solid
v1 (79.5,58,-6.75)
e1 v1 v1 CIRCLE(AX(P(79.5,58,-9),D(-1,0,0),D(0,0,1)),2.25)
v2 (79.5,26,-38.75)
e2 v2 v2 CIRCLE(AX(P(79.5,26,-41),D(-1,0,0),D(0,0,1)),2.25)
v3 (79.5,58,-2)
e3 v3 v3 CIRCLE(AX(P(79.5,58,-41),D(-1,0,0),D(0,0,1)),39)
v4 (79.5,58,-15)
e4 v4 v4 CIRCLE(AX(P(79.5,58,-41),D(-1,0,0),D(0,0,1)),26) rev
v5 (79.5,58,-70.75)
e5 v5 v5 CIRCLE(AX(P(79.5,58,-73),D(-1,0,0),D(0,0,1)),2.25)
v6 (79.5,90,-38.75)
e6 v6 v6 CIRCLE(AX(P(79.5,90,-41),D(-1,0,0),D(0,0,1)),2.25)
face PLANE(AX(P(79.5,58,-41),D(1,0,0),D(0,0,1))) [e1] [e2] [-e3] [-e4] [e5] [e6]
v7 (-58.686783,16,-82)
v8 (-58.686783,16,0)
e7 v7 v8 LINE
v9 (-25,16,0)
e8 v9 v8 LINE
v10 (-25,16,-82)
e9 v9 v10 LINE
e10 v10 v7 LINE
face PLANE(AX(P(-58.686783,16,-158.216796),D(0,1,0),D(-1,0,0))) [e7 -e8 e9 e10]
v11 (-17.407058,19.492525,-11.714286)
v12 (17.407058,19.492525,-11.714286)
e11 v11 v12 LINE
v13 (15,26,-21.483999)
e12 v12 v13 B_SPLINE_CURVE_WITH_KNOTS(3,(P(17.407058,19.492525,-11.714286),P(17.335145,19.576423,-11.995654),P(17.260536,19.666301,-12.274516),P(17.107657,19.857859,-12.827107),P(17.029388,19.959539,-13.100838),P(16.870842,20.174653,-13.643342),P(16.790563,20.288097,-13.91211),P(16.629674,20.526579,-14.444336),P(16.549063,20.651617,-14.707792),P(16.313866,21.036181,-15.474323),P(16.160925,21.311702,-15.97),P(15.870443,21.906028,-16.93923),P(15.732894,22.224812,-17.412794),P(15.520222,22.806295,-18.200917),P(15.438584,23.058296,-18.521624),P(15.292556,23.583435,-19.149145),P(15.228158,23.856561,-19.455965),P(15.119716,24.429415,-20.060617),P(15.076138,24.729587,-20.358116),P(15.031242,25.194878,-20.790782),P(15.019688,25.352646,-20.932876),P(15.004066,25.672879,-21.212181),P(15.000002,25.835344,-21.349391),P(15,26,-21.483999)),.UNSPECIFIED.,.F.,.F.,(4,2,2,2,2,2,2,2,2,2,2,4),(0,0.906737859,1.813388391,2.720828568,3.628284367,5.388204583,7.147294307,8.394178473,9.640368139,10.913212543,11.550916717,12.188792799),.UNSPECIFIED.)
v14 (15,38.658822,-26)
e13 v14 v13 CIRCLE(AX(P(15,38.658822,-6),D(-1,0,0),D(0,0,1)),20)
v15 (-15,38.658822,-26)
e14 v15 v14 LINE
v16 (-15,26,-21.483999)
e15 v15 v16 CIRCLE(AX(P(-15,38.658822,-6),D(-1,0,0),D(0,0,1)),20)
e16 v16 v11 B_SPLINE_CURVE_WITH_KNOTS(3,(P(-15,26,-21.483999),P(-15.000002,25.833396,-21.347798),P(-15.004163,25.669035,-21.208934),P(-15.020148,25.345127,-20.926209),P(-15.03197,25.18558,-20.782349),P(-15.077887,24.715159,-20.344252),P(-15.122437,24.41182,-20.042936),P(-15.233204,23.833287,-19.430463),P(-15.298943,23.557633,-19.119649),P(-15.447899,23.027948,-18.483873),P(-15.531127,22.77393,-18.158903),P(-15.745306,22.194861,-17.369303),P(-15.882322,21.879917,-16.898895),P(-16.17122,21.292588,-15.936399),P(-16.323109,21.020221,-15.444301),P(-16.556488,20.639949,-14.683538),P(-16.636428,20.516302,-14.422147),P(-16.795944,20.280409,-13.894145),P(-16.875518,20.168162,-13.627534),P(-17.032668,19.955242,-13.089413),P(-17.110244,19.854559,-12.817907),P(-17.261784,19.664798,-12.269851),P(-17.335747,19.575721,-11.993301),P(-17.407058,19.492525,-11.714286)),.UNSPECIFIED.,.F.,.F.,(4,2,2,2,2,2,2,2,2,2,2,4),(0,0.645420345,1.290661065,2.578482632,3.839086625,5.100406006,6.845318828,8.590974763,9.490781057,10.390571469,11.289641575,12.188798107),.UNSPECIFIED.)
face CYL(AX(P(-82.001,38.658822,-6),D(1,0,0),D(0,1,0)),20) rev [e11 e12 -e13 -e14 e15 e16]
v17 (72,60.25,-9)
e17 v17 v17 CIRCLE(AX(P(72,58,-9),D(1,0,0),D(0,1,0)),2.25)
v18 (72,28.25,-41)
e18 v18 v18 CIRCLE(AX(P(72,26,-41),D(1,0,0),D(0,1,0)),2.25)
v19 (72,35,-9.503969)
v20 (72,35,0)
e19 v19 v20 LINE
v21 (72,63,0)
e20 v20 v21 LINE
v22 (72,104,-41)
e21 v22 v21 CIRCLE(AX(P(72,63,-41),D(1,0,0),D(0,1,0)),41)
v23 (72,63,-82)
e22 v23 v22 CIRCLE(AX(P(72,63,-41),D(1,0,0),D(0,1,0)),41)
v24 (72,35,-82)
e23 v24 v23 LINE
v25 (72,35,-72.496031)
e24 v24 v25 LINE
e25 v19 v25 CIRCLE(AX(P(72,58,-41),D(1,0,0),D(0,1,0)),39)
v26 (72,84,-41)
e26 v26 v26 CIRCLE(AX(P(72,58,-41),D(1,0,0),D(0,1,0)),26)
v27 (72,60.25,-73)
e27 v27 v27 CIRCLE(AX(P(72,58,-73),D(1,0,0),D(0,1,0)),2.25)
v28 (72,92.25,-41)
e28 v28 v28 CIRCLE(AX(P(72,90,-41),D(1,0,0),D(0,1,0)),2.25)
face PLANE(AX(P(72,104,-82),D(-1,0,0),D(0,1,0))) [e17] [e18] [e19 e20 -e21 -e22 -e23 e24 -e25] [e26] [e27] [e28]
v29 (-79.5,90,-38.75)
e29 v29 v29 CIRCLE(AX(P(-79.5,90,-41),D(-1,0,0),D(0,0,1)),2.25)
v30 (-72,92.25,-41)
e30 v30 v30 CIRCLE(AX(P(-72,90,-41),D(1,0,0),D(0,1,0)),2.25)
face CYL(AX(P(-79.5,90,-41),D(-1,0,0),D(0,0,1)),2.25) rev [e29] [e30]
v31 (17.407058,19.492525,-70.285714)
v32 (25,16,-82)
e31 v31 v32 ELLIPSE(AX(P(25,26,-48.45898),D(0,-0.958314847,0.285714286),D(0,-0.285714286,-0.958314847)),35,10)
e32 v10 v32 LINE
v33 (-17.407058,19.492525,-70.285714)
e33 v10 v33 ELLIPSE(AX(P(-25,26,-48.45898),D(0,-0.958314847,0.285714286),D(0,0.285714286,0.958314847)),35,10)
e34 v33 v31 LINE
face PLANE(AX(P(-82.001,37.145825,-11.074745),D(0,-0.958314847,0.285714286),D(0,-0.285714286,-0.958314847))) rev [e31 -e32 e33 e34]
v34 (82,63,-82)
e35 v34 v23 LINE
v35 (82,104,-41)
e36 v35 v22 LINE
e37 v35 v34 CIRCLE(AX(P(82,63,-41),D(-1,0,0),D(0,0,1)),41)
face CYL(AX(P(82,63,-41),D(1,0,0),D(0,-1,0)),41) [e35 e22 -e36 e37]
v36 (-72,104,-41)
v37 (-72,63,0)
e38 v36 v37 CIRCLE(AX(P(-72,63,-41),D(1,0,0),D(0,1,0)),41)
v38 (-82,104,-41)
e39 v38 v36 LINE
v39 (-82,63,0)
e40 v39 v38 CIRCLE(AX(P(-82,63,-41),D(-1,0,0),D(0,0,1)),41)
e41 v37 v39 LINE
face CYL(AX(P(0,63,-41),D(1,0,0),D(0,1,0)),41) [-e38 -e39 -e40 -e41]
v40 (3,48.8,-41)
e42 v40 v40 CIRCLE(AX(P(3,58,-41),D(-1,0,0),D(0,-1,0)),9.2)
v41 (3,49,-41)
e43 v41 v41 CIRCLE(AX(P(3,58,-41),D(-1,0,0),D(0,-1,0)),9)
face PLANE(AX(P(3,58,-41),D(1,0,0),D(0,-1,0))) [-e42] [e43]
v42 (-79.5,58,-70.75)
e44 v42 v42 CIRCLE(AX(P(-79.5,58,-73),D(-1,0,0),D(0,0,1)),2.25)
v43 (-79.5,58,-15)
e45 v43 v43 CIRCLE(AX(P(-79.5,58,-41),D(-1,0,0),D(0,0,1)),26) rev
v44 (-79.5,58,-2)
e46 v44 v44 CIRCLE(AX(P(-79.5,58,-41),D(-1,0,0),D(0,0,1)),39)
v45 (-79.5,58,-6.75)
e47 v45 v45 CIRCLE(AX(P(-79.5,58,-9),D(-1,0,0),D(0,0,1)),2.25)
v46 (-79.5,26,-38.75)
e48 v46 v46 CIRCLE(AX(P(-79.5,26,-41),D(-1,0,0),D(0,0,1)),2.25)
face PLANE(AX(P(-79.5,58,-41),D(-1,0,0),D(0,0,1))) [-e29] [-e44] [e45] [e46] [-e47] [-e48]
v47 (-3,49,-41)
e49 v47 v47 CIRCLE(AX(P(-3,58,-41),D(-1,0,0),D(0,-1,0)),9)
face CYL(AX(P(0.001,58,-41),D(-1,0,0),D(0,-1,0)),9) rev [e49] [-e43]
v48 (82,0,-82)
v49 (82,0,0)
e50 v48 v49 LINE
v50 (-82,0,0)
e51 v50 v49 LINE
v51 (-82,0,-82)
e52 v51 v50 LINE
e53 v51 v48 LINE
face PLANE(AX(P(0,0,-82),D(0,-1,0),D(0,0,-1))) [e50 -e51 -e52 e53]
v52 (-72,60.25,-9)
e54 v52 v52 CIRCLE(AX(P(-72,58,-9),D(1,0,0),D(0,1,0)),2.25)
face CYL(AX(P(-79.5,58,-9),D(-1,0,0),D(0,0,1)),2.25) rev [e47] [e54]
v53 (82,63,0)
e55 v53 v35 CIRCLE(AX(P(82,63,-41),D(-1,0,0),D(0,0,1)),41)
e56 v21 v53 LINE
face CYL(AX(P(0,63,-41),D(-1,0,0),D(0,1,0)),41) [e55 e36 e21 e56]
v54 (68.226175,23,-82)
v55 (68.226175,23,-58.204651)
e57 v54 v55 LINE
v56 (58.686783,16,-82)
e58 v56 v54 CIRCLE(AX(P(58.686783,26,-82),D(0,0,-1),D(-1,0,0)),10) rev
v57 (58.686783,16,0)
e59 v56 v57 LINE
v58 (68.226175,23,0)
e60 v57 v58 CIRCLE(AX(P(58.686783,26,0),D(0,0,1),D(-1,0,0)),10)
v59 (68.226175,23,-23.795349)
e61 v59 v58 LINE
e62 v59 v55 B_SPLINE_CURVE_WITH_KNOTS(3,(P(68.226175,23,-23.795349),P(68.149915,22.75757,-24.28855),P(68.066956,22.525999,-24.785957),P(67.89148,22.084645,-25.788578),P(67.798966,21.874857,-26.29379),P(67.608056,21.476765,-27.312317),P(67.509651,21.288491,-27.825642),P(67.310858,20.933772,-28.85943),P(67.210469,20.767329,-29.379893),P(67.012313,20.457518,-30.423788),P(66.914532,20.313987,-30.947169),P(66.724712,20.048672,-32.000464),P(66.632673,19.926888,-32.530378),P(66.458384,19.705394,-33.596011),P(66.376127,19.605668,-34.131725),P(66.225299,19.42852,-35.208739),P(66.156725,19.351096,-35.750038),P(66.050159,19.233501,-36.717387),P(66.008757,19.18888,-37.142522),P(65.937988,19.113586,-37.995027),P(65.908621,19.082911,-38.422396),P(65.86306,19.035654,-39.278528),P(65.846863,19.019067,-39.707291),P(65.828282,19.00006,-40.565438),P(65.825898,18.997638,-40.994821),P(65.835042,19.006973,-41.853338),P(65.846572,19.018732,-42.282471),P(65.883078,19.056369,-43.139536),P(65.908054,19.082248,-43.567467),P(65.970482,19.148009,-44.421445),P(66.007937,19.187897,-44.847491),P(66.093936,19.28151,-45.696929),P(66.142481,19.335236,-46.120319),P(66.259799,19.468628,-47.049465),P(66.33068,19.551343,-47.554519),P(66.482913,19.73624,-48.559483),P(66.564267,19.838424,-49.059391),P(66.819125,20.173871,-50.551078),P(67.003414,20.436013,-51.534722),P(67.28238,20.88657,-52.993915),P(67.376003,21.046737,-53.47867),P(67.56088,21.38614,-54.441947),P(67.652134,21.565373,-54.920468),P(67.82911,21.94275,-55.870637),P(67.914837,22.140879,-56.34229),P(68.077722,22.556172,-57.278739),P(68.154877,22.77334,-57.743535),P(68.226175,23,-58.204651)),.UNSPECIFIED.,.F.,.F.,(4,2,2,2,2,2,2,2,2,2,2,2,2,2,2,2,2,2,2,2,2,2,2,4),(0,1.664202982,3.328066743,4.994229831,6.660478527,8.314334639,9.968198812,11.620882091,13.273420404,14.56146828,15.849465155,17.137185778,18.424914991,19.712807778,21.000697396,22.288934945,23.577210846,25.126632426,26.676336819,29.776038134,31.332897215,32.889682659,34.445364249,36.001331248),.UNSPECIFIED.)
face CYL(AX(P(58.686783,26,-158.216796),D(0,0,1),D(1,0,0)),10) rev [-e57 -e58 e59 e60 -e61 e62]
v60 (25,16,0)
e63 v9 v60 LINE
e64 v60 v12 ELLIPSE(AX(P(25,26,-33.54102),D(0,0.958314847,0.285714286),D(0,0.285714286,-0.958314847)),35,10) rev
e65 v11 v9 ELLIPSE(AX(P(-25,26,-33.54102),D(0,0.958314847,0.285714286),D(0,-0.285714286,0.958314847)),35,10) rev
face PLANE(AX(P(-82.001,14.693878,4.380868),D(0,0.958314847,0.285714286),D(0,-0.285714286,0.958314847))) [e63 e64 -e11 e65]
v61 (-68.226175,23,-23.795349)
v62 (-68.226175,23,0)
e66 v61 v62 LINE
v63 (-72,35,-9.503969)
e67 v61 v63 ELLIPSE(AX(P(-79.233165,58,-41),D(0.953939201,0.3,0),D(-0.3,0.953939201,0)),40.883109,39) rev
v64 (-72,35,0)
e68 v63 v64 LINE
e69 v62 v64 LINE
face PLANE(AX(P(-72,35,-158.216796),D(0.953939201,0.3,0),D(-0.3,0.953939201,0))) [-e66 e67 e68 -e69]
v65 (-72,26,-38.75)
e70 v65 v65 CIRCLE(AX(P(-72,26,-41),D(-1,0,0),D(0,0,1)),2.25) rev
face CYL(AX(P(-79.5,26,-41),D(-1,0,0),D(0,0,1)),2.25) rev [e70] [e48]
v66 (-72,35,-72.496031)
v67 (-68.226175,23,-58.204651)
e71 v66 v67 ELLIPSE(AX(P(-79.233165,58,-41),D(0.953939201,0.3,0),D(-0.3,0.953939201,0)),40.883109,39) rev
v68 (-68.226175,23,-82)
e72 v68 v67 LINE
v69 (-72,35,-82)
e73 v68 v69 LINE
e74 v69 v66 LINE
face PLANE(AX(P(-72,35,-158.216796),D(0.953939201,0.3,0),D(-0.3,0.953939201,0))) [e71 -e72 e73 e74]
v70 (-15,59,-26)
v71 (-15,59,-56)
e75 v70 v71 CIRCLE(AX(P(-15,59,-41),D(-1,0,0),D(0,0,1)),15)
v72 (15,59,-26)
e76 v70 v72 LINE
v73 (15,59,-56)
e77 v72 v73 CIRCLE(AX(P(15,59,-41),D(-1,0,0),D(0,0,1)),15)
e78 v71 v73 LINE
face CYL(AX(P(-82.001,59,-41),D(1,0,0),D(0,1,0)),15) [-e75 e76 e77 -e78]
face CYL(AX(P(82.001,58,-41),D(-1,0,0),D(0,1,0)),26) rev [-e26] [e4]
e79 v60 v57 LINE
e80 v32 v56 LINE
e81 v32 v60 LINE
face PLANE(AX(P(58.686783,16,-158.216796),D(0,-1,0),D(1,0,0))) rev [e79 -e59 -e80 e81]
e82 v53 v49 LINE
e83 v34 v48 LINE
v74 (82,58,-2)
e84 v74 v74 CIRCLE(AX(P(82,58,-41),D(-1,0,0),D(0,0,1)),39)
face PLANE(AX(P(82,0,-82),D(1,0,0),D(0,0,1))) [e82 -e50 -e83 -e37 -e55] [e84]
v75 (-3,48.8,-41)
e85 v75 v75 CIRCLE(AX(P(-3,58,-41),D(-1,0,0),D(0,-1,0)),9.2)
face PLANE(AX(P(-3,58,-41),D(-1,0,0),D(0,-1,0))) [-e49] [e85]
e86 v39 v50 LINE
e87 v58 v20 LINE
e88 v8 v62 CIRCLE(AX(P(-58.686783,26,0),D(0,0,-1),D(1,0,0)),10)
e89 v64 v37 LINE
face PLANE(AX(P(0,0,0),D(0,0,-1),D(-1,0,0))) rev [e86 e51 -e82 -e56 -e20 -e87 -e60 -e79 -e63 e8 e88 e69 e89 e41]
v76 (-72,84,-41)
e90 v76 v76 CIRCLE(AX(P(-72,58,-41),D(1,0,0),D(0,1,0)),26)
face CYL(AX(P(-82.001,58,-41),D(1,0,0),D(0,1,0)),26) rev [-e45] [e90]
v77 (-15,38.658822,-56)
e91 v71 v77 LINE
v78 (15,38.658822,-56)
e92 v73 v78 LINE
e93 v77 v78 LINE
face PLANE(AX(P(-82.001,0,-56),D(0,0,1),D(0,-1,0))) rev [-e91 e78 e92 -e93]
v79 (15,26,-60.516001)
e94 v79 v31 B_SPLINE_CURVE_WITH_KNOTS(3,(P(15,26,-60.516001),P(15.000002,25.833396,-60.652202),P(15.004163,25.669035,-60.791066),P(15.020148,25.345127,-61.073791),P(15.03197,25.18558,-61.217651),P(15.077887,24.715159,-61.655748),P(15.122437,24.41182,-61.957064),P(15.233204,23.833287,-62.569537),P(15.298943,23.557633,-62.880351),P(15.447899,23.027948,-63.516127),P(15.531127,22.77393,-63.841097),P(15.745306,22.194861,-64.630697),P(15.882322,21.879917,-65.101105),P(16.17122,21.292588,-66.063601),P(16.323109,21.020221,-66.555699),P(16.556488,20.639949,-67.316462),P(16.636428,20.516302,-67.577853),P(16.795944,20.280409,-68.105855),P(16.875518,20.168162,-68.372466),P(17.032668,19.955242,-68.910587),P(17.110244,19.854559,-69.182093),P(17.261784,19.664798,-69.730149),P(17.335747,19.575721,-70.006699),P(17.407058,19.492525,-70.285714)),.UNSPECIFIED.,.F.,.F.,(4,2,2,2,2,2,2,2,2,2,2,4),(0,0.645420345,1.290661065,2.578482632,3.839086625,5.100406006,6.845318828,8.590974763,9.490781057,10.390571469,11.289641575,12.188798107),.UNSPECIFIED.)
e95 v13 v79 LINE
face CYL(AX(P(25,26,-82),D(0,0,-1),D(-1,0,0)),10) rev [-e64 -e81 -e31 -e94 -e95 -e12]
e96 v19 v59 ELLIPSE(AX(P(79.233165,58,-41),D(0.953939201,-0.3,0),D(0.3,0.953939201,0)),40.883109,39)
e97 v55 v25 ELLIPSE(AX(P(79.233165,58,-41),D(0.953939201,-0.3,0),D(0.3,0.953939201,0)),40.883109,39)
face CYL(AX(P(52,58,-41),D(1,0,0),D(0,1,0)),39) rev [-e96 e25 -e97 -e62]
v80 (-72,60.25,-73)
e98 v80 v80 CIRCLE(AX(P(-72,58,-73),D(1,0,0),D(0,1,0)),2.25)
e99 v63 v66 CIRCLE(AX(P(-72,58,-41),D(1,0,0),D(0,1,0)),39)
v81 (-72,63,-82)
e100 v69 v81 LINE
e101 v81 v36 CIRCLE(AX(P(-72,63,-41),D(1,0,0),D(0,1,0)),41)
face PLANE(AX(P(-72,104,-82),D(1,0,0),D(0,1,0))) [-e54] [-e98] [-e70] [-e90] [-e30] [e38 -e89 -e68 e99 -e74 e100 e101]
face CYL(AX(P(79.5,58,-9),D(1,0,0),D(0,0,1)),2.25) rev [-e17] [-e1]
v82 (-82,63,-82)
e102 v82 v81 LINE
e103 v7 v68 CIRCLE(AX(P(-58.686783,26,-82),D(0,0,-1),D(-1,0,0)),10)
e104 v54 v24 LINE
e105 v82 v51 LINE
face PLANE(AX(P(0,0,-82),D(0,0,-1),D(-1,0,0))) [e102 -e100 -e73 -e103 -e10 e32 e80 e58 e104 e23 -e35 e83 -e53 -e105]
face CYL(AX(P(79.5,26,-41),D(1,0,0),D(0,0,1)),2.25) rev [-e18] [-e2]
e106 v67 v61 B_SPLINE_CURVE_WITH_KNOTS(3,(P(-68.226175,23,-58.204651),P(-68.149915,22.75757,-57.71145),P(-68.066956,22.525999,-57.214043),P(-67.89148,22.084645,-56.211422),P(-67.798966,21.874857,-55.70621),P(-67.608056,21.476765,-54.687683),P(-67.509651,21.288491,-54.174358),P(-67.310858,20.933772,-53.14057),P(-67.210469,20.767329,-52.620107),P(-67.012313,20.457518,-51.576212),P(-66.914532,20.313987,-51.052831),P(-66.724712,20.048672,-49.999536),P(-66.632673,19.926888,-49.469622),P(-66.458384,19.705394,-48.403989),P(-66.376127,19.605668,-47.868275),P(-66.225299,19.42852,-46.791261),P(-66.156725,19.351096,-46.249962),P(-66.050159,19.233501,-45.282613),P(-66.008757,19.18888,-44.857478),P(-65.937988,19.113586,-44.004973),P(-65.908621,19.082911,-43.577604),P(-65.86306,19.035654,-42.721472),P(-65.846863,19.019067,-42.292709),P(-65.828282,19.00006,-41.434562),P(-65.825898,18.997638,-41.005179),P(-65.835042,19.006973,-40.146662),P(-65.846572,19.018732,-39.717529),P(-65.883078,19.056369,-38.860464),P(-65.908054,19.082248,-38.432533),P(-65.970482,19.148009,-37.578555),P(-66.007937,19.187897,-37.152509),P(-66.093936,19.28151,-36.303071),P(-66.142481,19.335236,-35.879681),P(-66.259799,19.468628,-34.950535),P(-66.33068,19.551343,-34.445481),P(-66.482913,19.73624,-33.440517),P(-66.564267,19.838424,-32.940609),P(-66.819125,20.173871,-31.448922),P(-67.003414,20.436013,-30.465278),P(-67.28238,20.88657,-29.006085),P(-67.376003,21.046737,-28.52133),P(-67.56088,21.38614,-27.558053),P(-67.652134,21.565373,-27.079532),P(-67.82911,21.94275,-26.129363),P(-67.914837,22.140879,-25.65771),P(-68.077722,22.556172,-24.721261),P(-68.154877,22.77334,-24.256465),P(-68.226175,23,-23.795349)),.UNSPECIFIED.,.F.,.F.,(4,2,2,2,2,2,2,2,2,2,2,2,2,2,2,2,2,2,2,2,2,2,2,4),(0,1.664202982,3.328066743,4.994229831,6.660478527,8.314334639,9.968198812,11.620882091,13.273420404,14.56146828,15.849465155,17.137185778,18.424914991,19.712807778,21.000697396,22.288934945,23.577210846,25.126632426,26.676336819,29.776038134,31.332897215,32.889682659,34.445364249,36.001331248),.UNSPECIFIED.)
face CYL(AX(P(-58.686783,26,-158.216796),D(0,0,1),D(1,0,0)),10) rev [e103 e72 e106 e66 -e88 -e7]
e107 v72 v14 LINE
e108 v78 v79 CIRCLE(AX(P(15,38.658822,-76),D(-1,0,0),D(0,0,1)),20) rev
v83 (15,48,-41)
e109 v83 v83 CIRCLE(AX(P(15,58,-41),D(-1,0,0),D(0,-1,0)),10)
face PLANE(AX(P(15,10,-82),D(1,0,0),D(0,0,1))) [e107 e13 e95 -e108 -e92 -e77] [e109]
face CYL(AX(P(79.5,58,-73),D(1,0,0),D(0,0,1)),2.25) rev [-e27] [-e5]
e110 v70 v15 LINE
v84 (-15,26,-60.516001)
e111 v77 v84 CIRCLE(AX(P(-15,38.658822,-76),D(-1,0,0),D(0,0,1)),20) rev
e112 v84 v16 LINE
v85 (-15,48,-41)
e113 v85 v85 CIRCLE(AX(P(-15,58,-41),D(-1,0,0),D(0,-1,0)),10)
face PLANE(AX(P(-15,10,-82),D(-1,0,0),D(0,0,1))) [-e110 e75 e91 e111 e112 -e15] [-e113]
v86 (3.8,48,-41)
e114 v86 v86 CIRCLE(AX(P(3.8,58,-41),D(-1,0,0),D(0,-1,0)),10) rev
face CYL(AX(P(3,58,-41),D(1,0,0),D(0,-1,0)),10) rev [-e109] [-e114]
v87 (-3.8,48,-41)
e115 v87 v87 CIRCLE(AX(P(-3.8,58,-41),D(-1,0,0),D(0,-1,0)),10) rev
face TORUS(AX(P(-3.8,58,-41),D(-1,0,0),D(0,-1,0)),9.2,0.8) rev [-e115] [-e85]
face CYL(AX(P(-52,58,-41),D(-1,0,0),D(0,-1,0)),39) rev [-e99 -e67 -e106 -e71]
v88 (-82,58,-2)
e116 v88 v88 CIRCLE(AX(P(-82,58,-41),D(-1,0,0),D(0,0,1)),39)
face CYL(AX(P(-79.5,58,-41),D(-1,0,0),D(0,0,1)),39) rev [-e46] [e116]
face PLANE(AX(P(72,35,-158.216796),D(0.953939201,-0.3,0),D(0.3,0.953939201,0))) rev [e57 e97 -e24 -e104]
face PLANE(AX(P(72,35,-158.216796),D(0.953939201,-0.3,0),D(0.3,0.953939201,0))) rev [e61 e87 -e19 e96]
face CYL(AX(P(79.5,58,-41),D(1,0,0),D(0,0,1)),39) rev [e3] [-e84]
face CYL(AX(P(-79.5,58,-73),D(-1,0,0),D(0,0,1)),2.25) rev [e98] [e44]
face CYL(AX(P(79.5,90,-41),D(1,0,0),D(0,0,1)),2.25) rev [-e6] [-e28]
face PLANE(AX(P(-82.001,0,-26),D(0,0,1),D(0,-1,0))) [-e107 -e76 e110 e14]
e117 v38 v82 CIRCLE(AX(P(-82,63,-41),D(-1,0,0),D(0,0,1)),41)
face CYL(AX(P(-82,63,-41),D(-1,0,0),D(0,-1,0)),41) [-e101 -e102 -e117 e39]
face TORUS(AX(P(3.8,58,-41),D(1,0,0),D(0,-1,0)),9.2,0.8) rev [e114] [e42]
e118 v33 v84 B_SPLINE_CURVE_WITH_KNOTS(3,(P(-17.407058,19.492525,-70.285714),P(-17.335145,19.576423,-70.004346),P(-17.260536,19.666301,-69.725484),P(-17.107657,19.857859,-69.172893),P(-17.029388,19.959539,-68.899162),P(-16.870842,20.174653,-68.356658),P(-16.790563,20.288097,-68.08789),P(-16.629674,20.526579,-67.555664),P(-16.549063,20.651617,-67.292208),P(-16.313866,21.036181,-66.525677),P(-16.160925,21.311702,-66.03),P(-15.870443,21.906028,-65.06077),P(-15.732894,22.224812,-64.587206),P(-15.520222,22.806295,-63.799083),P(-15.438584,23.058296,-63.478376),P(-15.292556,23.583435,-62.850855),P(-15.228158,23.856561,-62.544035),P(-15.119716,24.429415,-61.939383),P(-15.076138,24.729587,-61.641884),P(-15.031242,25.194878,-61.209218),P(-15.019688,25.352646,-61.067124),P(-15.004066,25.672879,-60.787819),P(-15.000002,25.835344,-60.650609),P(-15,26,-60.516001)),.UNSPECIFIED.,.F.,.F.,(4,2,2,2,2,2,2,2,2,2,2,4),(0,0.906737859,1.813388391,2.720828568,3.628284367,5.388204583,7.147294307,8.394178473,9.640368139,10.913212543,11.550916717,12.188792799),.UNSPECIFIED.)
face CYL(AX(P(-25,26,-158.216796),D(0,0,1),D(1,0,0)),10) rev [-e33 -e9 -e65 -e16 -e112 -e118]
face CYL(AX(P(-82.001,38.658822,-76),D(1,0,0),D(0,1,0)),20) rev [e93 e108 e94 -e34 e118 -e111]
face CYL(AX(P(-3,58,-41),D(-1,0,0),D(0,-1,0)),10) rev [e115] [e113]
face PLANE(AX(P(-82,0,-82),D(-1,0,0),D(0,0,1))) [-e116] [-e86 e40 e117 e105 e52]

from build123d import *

# Parameters (mm, degrees)
BOSS_EXTRUDE1_DEPTH      = 82
SKETCH5_R                = 10
CUT_EXTRUDE1_DEPTH       = 12
CUT_EXTRUDE2_REACH       = 156.211
SKETCH6_R                = 9
CUT_EXTRUDE4_REACH       = 152.745
SKETCH8_R                = 26
CUT_EXTRUDE5_REACH       = 157.769
FILLET3_R                = 41
SKETCH13_R               = 39
CUT_EXTRUDE6_DEPTH       = 2.5
M4_CLEARANCE_HOLE1_D     = 4.5
M4_CLEARANCE_HOLE1_DEPTH = 7.5
FILLET5_R                = 0.8
CHAMFER2_SIZE            = 5
BOSS_EXTRUDE3_START      = -82
BOSS_EXTRUDE3_DEPTH      = 82
SKETCH19_R               = 39
CUT_EXTRUDE7_DEPTH       = 20
FILLET6_START            = -82.0000001
FILLET6_DEPTH            = 82.0000001
FILLET6_START_2          = -26
FILLET6_2_DEPTH          = 52


with BuildPart() as part:
    # Sketch1 → Boss-Extrude1 (new body)
    with BuildSketch(Plane.XY):
        Polygon((0, 0), (-72, 0), (-82, 0), (-82, 104), (-72, 104), (-72, 10), (-15, 10), (-15, 74), (0, 74), align=None)
    extrude(amount=-BOSS_EXTRUDE1_DEPTH)

    # Sketch5 → Cut-Extrude1 (cut)
    with BuildSketch(Plane.ZY.offset(15)):
        with Locations(Location((-41, 58, 0), (0, 0, 270))):
            Circle(SKETCH5_R)
    extrude(amount=-CUT_EXTRUDE1_DEPTH, mode=Mode.SUBTRACT)

    # Sketch6 → Cut-Extrude2 (cut, up to next)
    with BuildSketch(Plane.ZY.offset(3), mode=Mode.PRIVATE) as cut_extrude2_sk1:
        with Locations(Location((-41, 58, 0), (0, 0, 270))):
            Circle(SKETCH6_R)
    cut_extrude2_tool1 = extrude(cut_extrude2_sk1.sketch, amount=-CUT_EXTRUDE2_REACH, mode=Mode.PRIVATE) & part.part
    add(cut_extrude2_tool1.solids().sort_by_distance((-3, 58, -41))[0], mode=Mode.SUBTRACT)

    # Sketch8 → Cut-Extrude4 (cut, up to next)
    with BuildSketch(Plane(origin=(-72, 0, 0), x_dir=(0, 0, -1), z_dir=(1, 0, 0)), mode=Mode.PRIVATE) as cut_extrude4_sk1:
        with Locations(Location((41, 58, 0), (0, 0, 90))):
            Circle(SKETCH8_R)
    cut_extrude4_tool1 = extrude(cut_extrude4_sk1.sketch, amount=-CUT_EXTRUDE4_REACH, mode=Mode.PRIVATE) & part.part
    add(cut_extrude4_tool1.solids().sort_by_distance((-72, 58, -41))[0], mode=Mode.SUBTRACT)

    # Sketch10 → Cut-Extrude5 (cut, up to next)
    with BuildSketch(Plane(origin=(0, 0, 0), x_dir=(0, 0, -1), z_dir=(1, 0, 0)), mode=Mode.PRIVATE) as cut_extrude5_sk1:
        with BuildLine():
            Line((0, 74), (0, 16))
            Line((0, 16), (11.714285714, 19.492525222))
            ThreePointArc((11.714285714, 19.492525222), (22.035674515, 26.706536079), (26, 38.658822172))
            Line((26, 38.658822172), (26, 59))
            ThreePointArc((26, 59), (30.393398282, 69.606601718), (41, 74))
            Line((41, 74), (0, 74))
        make_face()
    cut_extrude5_tool1 = extrude(cut_extrude5_sk1.sketch, amount=-CUT_EXTRUDE5_REACH, mode=Mode.PRIVATE) & part.part
    # Sketch10 → Cut-Extrude5 (cut, up to next)
    with BuildSketch(Plane(origin=(0, 0, 0), x_dir=(0, 0, -1), z_dir=(1, 0, 0)), mode=Mode.PRIVATE) as cut_extrude5_sk2:
        with BuildLine():
            Line((82, 74), (41, 74))
            ThreePointArc((41, 74), (51.606601718, 69.606601718), (56, 59))
            Line((56, 59), (56, 38.658822172))
            ThreePointArc((56, 38.658822172), (59.964325485, 26.706536079), (70.285714286, 19.492525222))
            Line((70.285714286, 19.492525222), (82, 16))
            Line((82, 16), (82, 74))
        make_face()
    cut_extrude5_tool2 = extrude(cut_extrude5_sk2.sketch, amount=-CUT_EXTRUDE5_REACH, mode=Mode.PRIVATE) & part.part
    add(cut_extrude5_tool1.solids().sort_by_distance((0, 48.321716, -12.955067))[0], mode=Mode.SUBTRACT)
    add(cut_extrude5_tool2.solids().sort_by_distance((0, 48.321716, -69.044933))[0], mode=Mode.SUBTRACT)

    # Fillet3
    fillet3_edges = [part.edges().sort_by_distance(p)[0] for p in [
        (-77, 104, -82),
        (-77, 104, 0),
    ]]
    fillet(fillet3_edges, radius=FILLET3_R - 0.0001)  # a hair under: the kernel refuses the full size

    # Sketch13 → Cut-Extrude6 (cut)
    with BuildSketch(Plane.ZY.offset(82)):
        with Locations((-41, 58)):
            Circle(SKETCH13_R)
    extrude(amount=-CUT_EXTRUDE6_DEPTH, mode=Mode.SUBTRACT)

    # M4 Clearance Hole1
    with Locations(Plane.ZY.offset(79.5)):
        with Locations((-41, 90), (-9, 58), (-41, 26), (-73, 58)):
            Hole(M4_CLEARANCE_HOLE1_D / 2, depth=M4_CLEARANCE_HOLE1_DEPTH)

    # Fillet5
    fillet5_edges = [part.edges().sort_by_distance(p)[0] for p in [
        (-3, 68, -41),
    ]]
    fillet(fillet5_edges, radius=FILLET5_R)

    # Mirror1: part across plane


with BuildPart() as part_1:
    add(part.part)
    add(part.part.mirror(Plane(origin=(0, 74, -82), x_dir=(0, 0, 1), z_dir=(1, 0, 0))))

    # Chamfer2
    chamfer2_edges = [part_1.edges().sort_by_distance(p)[0] for p in [
        (72, 10, -41),
        (-72, 10, -41),
    ]]
    chamfer(chamfer2_edges, length=CHAMFER2_SIZE)

    # Sketch18 → Boss-Extrude3 (add)
    with BuildSketch(Plane.XY.offset(BOSS_EXTRUDE3_START)):
        with BuildLine():
            Line((-72, 35), (-68.226174588, 23))
            ThreePointArc((-68.226174588, 23), (-64.602862357, 17.937742252), (-58.686782574, 16))
            Line((-58.686782574, 16), (0, 16))
            Line((0, 16), (0, 10))
            Line((0, 10), (-67, 10))
            Line((-67, 10), (-72, 15))
            Line((-72, 15), (-72, 35))
        make_face()
    boss_extrude3 = extrude(amount=BOSS_EXTRUDE3_DEPTH)

    # Mirror2: Boss-Extrude3 across plane
    add(boss_extrude3.mirror(Plane(origin=(0, 0, 0), x_dir=(0, 0, 1), z_dir=(1, 0, 0))))

    # Sketch19 → Cut-Extrude7 (cut)
    with BuildSketch(Plane(origin=(-72, 0, 0), x_dir=(0, 0, -1), z_dir=(1, 0, 0))):
        with Locations(Location((41, 58, 0), (0, 0, 180))):
            Circle(SKETCH19_R)
    cut_extrude7 = extrude(amount=CUT_EXTRUDE7_DEPTH, mode=Mode.SUBTRACT)

    # Mirror3: Cut-Extrude7 across plane
    add(cut_extrude7.mirror(Plane(origin=(0, 0, 0), x_dir=(0, 0, 1), z_dir=(1, 0, 0))), mode=Mode.SUBTRACT)

    # Fillet6: read off the stored shape, not the designer's step
    # Fillet6 outline → Fillet6 (add)
    with BuildSketch(Plane.XY.offset(FILLET6_START)):
        with BuildLine():
            Line((15, 16), (25, 16))
            ThreePointArc((25, 16), (17.928932188, 18.928932188), (15, 26))
            Line((15, 26), (15, 16))
        make_face()
        with BuildLine():
            ThreePointArc((-15, 26), (-17.928932188, 18.928932188), (-25, 16))
            Line((-25, 16), (-15, 16))
            Line((-15, 16), (-15, 26))
        make_face()
    extrude(amount=FILLET6_DEPTH)

    # Fillet6 2 outline → Fillet6 2 (cut)
    with BuildSketch(Plane.YZ.offset(FILLET6_START_2)):
        with BuildLine():
            Line((19.492525222, -70.285714286), (16, -82))
            Line((16, -82), (26, -82.0000001))
            Line((26, -82.0000001), (26, -60.516001123))
            ThreePointArc((26, -60.516001123), (22.013361061, -64.912681821), (19.492525222, -70.285714286))
        make_face()
        with BuildLine():
            Line((26, 0), (16, 0))
            Line((16, 0), (19.492525222, -11.714285714))
            ThreePointArc((19.492525222, -11.714285714), (22.013361061, -17.087318179), (26, -21.483998877))
            Line((26, -21.483998877), (26, 0))
        make_face()
    extrude(amount=FILLET6_2_DEPTH, mode=Mode.SUBTRACT)


solid = part_1.part
